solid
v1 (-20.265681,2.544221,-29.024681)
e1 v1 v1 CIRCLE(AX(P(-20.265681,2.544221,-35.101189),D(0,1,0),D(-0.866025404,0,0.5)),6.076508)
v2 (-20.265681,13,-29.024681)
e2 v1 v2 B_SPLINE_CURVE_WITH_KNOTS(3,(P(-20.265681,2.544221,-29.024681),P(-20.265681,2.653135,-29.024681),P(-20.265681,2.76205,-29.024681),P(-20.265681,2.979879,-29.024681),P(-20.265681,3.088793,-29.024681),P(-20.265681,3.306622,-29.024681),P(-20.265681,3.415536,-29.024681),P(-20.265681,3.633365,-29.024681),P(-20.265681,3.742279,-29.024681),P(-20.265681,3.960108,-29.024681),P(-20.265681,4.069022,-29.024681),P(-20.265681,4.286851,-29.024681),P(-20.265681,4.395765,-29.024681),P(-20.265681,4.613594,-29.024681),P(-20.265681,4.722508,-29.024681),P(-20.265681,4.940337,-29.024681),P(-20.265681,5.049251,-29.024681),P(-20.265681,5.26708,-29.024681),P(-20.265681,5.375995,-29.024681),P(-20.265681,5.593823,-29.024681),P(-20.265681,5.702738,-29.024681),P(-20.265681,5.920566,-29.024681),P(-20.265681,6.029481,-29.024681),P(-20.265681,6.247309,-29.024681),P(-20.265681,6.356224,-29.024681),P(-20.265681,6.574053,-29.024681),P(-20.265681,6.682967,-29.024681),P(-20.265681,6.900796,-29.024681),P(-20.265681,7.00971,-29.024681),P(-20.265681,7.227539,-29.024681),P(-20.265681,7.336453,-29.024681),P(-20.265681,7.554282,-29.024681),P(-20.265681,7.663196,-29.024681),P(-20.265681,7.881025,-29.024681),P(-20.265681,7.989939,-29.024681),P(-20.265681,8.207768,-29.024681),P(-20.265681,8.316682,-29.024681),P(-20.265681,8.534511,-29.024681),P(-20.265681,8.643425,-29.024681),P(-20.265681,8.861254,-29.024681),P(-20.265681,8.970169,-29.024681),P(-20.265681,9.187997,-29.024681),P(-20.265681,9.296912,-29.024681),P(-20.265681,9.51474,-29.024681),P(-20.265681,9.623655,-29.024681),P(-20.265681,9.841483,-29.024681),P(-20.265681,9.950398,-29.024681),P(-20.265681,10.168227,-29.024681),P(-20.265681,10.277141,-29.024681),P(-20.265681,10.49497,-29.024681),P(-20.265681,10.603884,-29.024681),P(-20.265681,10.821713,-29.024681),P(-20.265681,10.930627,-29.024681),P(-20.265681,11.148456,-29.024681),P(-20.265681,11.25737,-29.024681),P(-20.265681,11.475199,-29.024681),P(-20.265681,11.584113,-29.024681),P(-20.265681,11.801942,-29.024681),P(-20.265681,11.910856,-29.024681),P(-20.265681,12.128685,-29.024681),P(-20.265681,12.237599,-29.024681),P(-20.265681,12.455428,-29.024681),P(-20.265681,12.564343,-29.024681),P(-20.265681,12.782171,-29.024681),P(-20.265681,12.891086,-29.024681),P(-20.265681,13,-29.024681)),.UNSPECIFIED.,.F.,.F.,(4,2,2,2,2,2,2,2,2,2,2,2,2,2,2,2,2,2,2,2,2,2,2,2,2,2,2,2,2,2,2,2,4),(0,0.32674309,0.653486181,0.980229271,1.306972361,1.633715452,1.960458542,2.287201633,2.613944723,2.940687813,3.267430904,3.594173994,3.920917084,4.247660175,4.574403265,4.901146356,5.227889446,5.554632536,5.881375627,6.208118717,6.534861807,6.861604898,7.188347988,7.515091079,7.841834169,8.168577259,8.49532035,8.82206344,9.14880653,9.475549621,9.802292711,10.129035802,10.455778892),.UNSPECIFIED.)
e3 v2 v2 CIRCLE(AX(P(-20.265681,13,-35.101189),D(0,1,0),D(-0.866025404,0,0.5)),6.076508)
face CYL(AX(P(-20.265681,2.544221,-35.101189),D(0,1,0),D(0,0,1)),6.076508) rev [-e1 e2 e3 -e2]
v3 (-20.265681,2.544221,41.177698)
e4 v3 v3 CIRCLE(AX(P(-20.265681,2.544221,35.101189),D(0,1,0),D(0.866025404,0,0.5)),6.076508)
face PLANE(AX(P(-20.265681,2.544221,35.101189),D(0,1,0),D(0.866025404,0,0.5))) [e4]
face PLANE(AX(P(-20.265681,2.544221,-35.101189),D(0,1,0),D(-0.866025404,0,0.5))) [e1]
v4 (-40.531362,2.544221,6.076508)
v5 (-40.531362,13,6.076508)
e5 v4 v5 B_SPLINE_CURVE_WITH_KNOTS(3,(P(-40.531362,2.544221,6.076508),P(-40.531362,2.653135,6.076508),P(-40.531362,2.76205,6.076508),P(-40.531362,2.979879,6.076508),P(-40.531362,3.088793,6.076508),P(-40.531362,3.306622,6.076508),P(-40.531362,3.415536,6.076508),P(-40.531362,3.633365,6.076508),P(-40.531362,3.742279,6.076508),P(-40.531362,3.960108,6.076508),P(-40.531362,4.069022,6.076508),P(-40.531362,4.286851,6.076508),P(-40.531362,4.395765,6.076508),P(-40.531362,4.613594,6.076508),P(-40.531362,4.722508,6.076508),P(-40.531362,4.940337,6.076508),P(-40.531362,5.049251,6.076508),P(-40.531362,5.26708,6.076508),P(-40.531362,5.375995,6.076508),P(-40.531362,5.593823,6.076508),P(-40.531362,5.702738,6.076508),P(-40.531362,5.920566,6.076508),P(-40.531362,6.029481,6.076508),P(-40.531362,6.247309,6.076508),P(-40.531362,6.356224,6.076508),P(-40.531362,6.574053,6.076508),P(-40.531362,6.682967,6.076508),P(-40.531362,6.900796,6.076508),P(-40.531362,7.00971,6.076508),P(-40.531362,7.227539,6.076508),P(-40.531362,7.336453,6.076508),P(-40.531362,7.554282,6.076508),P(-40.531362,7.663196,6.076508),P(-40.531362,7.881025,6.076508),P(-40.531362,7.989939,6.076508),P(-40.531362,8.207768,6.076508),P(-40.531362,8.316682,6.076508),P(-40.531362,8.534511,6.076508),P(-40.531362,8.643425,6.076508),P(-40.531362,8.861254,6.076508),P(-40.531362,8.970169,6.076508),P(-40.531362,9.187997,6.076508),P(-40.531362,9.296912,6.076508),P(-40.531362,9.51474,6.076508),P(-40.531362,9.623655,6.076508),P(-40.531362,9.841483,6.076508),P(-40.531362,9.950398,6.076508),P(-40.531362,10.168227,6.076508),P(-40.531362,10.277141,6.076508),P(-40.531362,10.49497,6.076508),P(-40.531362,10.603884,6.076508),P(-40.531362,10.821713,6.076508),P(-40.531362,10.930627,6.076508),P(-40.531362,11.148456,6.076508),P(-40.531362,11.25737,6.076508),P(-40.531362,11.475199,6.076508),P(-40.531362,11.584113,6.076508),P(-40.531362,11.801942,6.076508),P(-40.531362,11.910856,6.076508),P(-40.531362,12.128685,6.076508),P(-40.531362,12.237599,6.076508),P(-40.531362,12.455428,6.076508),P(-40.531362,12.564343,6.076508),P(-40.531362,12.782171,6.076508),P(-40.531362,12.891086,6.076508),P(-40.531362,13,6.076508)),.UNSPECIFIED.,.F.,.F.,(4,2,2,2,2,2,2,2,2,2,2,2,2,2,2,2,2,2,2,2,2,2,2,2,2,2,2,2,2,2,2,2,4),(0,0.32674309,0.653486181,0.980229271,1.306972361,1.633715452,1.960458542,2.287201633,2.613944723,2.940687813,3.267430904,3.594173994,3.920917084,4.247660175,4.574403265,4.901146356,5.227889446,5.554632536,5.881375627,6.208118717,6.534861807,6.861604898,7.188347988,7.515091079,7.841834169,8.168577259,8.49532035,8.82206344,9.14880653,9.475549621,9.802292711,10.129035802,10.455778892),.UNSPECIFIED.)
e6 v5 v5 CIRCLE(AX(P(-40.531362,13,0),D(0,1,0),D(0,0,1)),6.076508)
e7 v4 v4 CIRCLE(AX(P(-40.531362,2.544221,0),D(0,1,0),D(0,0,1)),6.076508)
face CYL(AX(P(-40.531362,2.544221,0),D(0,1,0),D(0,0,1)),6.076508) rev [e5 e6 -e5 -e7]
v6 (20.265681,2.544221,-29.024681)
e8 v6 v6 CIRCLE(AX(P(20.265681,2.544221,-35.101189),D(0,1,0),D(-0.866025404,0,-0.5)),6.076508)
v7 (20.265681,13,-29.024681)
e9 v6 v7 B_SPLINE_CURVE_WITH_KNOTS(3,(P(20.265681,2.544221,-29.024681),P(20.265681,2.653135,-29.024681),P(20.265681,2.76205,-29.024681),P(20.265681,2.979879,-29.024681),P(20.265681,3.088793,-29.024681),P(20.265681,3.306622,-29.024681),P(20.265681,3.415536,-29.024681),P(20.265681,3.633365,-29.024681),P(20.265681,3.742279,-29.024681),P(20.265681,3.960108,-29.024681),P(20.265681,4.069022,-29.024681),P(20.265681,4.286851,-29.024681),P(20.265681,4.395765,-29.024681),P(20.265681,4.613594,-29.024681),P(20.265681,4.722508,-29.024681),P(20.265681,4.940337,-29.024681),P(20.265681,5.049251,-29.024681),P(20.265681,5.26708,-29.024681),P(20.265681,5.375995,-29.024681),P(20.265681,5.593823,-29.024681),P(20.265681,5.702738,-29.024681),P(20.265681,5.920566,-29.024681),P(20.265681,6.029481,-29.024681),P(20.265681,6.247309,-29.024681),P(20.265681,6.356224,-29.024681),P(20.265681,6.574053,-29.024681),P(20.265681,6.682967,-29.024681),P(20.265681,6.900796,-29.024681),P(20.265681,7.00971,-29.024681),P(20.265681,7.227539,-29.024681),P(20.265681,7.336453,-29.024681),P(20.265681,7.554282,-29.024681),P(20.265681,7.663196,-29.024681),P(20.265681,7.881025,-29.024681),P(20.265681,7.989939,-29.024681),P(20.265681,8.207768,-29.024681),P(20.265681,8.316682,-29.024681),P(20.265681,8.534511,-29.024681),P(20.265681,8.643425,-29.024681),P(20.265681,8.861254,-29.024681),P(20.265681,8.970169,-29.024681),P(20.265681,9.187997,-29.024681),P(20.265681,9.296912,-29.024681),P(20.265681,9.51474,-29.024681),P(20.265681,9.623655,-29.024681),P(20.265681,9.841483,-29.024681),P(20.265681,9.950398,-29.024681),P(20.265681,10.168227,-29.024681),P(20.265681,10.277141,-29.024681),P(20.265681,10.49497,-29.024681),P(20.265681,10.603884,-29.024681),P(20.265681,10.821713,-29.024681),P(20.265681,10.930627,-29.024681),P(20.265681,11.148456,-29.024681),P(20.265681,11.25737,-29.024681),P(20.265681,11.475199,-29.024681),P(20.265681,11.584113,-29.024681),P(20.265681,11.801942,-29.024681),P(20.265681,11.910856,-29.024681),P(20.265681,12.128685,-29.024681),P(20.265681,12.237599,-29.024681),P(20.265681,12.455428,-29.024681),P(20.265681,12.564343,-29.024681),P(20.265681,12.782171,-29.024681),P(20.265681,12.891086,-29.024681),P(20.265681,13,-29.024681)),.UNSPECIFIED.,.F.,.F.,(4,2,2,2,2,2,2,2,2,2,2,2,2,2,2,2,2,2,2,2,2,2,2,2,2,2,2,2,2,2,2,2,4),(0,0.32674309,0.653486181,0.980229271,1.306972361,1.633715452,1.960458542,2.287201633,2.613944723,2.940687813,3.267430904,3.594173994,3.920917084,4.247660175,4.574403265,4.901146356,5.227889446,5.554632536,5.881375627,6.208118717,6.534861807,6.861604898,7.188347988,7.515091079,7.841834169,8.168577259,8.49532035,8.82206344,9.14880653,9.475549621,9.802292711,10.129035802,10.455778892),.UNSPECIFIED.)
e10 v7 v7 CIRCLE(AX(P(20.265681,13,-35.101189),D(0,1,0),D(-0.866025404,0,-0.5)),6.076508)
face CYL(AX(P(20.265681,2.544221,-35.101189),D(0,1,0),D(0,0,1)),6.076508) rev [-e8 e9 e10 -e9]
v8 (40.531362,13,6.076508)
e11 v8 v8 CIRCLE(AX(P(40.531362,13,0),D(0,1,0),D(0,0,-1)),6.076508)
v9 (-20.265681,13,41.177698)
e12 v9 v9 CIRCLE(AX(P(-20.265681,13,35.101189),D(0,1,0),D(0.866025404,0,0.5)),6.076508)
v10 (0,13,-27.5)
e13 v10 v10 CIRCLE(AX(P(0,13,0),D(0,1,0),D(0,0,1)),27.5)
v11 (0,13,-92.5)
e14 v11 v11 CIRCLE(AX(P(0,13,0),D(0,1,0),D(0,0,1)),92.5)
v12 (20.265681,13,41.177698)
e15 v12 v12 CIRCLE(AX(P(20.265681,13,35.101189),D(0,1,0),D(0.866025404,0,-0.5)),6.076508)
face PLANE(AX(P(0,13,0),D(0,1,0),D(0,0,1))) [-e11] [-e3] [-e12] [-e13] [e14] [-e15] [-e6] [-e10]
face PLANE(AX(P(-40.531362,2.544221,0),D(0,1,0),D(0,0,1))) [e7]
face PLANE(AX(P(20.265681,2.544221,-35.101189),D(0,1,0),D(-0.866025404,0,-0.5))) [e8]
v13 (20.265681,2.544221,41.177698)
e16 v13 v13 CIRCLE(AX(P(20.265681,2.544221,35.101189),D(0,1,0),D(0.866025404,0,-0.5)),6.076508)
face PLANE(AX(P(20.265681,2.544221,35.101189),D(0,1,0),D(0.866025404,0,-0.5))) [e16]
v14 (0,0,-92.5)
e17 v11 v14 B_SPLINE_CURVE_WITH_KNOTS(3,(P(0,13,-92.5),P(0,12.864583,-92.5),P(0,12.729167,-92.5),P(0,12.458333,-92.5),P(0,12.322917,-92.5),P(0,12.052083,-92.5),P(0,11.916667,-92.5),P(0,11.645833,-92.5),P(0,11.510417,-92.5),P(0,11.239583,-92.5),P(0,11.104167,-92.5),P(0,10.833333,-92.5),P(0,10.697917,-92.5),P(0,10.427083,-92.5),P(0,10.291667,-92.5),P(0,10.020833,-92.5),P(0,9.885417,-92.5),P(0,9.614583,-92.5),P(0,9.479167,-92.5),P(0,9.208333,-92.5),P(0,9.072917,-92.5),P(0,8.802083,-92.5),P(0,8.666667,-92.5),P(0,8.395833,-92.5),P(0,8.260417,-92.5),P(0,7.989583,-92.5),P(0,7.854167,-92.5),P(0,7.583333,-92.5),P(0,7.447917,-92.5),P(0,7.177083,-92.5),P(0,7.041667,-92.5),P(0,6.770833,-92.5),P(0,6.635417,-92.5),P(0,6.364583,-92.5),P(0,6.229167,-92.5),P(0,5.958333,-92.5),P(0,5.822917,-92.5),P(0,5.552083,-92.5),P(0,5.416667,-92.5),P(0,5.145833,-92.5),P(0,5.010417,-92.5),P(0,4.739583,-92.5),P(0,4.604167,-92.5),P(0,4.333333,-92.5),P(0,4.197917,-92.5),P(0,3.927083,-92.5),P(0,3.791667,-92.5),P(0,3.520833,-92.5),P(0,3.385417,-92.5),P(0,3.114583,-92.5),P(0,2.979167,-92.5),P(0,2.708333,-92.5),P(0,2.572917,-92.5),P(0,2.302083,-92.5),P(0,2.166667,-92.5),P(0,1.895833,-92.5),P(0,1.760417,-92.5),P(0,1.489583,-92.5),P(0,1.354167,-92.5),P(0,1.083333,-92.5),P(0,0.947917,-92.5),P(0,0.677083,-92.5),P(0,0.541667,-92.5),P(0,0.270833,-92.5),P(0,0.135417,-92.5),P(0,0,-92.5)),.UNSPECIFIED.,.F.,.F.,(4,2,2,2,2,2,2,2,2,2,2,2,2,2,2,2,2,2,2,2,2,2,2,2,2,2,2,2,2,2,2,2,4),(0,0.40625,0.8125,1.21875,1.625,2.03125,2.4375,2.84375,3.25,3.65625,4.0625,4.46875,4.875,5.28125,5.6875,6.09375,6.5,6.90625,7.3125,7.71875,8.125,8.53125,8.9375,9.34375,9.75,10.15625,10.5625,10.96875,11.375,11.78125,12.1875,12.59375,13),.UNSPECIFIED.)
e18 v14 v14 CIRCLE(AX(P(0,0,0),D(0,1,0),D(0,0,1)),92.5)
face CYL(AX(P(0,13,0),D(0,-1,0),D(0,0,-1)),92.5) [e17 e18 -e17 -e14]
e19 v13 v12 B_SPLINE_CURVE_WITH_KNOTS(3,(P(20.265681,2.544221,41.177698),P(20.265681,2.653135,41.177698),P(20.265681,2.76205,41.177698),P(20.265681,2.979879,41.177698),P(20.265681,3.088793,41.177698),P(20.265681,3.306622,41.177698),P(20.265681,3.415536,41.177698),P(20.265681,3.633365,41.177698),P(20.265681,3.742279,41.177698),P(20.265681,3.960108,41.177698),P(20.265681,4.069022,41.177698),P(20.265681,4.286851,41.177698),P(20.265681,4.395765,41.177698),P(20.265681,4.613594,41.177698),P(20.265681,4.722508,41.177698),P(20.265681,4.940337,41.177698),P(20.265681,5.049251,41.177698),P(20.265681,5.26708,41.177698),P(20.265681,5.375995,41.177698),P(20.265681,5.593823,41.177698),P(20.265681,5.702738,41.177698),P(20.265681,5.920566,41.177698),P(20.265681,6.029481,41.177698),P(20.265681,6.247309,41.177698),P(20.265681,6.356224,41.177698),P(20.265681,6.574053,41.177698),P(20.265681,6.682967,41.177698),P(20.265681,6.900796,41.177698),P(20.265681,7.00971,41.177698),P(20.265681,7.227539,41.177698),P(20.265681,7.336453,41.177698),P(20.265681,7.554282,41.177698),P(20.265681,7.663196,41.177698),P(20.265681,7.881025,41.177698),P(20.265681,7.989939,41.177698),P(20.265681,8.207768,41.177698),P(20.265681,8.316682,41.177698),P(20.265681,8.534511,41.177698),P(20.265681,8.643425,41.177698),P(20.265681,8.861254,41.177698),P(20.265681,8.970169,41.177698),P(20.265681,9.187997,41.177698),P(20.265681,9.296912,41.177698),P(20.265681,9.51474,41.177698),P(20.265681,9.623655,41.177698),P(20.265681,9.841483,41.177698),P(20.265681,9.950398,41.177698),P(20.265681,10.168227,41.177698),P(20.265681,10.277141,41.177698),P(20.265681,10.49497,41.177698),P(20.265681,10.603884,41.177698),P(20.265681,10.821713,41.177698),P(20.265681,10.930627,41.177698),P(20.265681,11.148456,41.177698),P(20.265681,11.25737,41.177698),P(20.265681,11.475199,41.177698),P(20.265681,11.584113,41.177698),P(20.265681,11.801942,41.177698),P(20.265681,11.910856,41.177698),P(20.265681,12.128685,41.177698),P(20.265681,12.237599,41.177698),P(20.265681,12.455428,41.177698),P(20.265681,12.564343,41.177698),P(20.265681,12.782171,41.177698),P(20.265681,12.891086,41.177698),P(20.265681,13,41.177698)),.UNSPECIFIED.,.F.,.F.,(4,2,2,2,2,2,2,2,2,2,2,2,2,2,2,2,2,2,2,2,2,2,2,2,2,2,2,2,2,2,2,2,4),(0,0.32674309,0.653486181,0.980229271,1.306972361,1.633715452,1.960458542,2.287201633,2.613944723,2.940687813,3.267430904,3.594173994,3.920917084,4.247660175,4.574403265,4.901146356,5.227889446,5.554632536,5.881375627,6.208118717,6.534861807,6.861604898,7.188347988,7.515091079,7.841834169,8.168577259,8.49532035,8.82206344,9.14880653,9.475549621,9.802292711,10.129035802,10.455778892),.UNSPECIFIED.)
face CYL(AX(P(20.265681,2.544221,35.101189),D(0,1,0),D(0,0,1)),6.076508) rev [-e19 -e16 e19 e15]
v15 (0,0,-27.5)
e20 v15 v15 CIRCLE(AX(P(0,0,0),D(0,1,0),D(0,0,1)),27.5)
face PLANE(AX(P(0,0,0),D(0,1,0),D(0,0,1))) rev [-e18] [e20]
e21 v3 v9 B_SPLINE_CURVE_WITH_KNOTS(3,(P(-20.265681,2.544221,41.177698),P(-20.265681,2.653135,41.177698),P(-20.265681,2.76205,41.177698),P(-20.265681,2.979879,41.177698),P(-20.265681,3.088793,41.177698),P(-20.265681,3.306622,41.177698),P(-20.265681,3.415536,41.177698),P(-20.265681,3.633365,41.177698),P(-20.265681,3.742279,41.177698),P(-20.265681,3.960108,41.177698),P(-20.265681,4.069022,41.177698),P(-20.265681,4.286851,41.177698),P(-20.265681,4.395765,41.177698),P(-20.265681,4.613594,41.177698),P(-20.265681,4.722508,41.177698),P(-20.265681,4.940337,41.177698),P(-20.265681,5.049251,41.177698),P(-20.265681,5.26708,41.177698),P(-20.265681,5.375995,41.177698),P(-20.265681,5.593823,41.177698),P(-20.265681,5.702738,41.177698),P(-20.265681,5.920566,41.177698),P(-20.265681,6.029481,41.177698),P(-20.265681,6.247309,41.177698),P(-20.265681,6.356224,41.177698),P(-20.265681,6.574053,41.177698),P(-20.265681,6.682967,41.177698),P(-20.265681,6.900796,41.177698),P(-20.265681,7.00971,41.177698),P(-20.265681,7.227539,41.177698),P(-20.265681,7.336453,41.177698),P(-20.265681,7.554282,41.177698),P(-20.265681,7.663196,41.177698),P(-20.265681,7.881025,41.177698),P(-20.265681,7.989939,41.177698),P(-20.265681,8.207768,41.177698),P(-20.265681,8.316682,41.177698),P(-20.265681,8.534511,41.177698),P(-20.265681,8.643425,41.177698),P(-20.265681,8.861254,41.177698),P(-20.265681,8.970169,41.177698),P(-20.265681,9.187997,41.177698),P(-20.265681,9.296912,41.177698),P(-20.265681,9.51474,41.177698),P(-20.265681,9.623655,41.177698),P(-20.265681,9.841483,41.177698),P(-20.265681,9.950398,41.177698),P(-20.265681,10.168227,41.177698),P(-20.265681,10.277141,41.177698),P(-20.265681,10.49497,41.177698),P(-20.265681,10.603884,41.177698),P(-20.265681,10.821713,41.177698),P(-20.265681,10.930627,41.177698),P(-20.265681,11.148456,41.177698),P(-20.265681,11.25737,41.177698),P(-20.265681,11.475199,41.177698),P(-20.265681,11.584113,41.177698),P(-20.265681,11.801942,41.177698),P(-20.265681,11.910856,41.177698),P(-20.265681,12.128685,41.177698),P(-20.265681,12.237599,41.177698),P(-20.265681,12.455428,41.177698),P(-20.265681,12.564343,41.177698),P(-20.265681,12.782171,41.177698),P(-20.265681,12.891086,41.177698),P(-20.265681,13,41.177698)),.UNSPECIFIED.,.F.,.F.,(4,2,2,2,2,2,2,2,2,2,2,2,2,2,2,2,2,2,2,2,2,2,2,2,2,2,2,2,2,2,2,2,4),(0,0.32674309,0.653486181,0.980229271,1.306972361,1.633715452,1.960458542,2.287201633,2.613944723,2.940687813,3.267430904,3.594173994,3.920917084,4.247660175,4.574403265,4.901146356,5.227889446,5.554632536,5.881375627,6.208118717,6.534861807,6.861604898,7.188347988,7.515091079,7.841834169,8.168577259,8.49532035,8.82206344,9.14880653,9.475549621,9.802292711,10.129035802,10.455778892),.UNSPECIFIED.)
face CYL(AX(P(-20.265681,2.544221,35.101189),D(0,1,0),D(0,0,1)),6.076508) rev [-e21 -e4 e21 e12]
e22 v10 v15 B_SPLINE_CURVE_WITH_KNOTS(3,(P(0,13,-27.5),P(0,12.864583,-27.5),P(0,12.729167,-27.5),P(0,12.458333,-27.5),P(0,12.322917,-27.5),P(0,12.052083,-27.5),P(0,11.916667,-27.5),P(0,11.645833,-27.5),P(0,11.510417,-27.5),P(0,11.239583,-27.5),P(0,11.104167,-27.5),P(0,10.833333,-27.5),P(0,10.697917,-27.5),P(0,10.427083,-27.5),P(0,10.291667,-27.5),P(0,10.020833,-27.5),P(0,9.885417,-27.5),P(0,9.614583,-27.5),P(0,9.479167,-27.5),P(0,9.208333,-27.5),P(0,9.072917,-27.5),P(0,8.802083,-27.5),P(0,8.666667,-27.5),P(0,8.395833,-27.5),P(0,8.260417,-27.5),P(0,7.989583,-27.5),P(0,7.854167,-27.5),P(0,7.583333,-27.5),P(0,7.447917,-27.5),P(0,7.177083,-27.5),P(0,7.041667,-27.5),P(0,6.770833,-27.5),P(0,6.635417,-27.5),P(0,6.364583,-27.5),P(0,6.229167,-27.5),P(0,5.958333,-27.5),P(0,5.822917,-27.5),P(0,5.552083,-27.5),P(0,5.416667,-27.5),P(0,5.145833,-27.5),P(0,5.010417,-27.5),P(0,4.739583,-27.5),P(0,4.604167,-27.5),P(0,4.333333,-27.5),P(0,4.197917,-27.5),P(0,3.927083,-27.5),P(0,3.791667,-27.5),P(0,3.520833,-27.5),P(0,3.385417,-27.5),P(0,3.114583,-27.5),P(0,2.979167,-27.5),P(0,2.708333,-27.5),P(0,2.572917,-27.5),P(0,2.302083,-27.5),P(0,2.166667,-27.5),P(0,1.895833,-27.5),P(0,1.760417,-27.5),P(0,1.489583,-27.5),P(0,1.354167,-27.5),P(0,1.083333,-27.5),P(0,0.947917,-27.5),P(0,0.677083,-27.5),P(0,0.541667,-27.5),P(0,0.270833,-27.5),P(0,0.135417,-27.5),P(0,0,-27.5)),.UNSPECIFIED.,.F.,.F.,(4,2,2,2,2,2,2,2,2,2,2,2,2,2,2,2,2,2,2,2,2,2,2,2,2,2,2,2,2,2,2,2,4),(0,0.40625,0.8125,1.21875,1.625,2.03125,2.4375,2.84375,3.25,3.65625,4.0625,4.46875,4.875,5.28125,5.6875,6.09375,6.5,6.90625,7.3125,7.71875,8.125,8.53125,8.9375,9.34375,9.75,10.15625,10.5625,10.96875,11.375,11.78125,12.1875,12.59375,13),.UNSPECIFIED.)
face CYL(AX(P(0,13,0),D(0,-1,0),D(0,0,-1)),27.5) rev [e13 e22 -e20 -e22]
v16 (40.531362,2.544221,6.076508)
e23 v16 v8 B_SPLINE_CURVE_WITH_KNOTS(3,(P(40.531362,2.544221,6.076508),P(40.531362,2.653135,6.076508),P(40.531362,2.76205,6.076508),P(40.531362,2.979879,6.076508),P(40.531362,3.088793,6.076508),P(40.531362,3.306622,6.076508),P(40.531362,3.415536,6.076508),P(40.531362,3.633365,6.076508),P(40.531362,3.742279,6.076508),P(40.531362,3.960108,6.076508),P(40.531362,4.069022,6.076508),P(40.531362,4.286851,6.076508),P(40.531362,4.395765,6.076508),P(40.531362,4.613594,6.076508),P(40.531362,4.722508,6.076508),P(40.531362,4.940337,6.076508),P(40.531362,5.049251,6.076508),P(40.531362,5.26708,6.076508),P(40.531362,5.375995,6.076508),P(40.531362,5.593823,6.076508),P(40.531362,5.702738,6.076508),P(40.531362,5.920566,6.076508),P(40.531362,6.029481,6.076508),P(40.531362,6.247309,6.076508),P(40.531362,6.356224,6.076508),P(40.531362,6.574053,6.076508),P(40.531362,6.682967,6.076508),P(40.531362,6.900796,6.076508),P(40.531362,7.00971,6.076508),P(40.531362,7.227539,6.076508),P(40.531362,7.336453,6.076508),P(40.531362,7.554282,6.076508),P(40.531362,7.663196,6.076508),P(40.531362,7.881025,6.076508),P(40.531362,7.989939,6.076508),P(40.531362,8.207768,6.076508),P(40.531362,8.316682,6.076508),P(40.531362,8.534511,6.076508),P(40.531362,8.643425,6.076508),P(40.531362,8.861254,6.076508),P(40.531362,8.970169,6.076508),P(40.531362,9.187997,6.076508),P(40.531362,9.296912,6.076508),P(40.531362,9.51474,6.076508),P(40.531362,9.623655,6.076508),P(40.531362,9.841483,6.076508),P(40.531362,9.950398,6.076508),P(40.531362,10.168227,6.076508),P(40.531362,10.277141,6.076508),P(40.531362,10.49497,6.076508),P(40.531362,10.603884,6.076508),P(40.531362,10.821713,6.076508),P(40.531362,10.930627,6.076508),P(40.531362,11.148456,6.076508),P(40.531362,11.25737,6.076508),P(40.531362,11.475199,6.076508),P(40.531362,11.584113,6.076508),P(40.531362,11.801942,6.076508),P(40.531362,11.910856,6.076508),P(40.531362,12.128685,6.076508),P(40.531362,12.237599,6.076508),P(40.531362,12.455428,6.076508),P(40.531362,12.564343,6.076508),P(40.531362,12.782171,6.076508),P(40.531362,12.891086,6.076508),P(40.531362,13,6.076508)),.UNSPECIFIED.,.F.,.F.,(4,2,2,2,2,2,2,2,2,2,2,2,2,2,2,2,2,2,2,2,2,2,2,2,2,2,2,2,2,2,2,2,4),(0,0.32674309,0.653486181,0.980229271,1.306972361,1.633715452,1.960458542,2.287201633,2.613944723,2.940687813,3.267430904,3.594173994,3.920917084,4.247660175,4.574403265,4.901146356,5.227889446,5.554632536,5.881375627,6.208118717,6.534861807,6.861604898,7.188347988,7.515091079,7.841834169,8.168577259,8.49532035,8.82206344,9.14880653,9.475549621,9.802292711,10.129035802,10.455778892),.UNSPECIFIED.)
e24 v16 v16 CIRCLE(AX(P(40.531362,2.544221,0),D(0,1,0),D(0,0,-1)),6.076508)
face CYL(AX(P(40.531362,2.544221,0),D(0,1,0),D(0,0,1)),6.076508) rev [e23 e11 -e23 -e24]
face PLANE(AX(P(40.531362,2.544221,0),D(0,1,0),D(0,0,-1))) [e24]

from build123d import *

# Parameters (mm, degrees)
SKETCH1_R           = 92.5
BOSS_EXTRUDE1_DEPTH = 13
SKETCH2_R           = 27.5
CUT_EXTRUDE1_DEPTH  = 132.459119121
SKETCH3_R           = 6.076508431
CUT_EXTRUDE2_DEPTH  = 10.455778892
CIRPATTERN1_COUNT   = 6


with BuildPart() as part:
    # Sketch1 → Boss-Extrude1 (new body)
    with BuildSketch(Plane(origin=(0, 0, 0), x_dir=(1, 0, 0), z_dir=(0, 1, 0))):
        Circle(SKETCH1_R)
    extrude(amount=BOSS_EXTRUDE1_DEPTH)

    # Sketch2 → Cut-Extrude1 (cut, through all)
    with BuildSketch(Plane(origin=(0, 0, 0), x_dir=(1, 0, 0), z_dir=(0, 1, 0))):
        Circle(SKETCH2_R)
    extrude(amount=CUT_EXTRUDE1_DEPTH, mode=Mode.SUBTRACT)

    # Sketch3 → Cut-Extrude2 (cut)
    with BuildSketch(Plane(origin=(0, 13, 0), x_dir=(1, 0, 0), z_dir=(0, 1, 0))):
        with Locations((-40.531362266, 0)):
            Circle(SKETCH3_R)
    cut_extrude2 = extrude(amount=-CUT_EXTRUDE2_DEPTH, mode=Mode.SUBTRACT)

    # CirPattern1: Cut-Extrude2 ×6 about axis
    cirpattern1_axis = Axis((0, 0, 0), (0, 1, 0))
    for i in range(1, CIRPATTERN1_COUNT):
        add(cut_extrude2.rotate(cirpattern1_axis, i * 360 / CIRPATTERN1_COUNT), mode=Mode.SUBTRACT)


solid = part.part
